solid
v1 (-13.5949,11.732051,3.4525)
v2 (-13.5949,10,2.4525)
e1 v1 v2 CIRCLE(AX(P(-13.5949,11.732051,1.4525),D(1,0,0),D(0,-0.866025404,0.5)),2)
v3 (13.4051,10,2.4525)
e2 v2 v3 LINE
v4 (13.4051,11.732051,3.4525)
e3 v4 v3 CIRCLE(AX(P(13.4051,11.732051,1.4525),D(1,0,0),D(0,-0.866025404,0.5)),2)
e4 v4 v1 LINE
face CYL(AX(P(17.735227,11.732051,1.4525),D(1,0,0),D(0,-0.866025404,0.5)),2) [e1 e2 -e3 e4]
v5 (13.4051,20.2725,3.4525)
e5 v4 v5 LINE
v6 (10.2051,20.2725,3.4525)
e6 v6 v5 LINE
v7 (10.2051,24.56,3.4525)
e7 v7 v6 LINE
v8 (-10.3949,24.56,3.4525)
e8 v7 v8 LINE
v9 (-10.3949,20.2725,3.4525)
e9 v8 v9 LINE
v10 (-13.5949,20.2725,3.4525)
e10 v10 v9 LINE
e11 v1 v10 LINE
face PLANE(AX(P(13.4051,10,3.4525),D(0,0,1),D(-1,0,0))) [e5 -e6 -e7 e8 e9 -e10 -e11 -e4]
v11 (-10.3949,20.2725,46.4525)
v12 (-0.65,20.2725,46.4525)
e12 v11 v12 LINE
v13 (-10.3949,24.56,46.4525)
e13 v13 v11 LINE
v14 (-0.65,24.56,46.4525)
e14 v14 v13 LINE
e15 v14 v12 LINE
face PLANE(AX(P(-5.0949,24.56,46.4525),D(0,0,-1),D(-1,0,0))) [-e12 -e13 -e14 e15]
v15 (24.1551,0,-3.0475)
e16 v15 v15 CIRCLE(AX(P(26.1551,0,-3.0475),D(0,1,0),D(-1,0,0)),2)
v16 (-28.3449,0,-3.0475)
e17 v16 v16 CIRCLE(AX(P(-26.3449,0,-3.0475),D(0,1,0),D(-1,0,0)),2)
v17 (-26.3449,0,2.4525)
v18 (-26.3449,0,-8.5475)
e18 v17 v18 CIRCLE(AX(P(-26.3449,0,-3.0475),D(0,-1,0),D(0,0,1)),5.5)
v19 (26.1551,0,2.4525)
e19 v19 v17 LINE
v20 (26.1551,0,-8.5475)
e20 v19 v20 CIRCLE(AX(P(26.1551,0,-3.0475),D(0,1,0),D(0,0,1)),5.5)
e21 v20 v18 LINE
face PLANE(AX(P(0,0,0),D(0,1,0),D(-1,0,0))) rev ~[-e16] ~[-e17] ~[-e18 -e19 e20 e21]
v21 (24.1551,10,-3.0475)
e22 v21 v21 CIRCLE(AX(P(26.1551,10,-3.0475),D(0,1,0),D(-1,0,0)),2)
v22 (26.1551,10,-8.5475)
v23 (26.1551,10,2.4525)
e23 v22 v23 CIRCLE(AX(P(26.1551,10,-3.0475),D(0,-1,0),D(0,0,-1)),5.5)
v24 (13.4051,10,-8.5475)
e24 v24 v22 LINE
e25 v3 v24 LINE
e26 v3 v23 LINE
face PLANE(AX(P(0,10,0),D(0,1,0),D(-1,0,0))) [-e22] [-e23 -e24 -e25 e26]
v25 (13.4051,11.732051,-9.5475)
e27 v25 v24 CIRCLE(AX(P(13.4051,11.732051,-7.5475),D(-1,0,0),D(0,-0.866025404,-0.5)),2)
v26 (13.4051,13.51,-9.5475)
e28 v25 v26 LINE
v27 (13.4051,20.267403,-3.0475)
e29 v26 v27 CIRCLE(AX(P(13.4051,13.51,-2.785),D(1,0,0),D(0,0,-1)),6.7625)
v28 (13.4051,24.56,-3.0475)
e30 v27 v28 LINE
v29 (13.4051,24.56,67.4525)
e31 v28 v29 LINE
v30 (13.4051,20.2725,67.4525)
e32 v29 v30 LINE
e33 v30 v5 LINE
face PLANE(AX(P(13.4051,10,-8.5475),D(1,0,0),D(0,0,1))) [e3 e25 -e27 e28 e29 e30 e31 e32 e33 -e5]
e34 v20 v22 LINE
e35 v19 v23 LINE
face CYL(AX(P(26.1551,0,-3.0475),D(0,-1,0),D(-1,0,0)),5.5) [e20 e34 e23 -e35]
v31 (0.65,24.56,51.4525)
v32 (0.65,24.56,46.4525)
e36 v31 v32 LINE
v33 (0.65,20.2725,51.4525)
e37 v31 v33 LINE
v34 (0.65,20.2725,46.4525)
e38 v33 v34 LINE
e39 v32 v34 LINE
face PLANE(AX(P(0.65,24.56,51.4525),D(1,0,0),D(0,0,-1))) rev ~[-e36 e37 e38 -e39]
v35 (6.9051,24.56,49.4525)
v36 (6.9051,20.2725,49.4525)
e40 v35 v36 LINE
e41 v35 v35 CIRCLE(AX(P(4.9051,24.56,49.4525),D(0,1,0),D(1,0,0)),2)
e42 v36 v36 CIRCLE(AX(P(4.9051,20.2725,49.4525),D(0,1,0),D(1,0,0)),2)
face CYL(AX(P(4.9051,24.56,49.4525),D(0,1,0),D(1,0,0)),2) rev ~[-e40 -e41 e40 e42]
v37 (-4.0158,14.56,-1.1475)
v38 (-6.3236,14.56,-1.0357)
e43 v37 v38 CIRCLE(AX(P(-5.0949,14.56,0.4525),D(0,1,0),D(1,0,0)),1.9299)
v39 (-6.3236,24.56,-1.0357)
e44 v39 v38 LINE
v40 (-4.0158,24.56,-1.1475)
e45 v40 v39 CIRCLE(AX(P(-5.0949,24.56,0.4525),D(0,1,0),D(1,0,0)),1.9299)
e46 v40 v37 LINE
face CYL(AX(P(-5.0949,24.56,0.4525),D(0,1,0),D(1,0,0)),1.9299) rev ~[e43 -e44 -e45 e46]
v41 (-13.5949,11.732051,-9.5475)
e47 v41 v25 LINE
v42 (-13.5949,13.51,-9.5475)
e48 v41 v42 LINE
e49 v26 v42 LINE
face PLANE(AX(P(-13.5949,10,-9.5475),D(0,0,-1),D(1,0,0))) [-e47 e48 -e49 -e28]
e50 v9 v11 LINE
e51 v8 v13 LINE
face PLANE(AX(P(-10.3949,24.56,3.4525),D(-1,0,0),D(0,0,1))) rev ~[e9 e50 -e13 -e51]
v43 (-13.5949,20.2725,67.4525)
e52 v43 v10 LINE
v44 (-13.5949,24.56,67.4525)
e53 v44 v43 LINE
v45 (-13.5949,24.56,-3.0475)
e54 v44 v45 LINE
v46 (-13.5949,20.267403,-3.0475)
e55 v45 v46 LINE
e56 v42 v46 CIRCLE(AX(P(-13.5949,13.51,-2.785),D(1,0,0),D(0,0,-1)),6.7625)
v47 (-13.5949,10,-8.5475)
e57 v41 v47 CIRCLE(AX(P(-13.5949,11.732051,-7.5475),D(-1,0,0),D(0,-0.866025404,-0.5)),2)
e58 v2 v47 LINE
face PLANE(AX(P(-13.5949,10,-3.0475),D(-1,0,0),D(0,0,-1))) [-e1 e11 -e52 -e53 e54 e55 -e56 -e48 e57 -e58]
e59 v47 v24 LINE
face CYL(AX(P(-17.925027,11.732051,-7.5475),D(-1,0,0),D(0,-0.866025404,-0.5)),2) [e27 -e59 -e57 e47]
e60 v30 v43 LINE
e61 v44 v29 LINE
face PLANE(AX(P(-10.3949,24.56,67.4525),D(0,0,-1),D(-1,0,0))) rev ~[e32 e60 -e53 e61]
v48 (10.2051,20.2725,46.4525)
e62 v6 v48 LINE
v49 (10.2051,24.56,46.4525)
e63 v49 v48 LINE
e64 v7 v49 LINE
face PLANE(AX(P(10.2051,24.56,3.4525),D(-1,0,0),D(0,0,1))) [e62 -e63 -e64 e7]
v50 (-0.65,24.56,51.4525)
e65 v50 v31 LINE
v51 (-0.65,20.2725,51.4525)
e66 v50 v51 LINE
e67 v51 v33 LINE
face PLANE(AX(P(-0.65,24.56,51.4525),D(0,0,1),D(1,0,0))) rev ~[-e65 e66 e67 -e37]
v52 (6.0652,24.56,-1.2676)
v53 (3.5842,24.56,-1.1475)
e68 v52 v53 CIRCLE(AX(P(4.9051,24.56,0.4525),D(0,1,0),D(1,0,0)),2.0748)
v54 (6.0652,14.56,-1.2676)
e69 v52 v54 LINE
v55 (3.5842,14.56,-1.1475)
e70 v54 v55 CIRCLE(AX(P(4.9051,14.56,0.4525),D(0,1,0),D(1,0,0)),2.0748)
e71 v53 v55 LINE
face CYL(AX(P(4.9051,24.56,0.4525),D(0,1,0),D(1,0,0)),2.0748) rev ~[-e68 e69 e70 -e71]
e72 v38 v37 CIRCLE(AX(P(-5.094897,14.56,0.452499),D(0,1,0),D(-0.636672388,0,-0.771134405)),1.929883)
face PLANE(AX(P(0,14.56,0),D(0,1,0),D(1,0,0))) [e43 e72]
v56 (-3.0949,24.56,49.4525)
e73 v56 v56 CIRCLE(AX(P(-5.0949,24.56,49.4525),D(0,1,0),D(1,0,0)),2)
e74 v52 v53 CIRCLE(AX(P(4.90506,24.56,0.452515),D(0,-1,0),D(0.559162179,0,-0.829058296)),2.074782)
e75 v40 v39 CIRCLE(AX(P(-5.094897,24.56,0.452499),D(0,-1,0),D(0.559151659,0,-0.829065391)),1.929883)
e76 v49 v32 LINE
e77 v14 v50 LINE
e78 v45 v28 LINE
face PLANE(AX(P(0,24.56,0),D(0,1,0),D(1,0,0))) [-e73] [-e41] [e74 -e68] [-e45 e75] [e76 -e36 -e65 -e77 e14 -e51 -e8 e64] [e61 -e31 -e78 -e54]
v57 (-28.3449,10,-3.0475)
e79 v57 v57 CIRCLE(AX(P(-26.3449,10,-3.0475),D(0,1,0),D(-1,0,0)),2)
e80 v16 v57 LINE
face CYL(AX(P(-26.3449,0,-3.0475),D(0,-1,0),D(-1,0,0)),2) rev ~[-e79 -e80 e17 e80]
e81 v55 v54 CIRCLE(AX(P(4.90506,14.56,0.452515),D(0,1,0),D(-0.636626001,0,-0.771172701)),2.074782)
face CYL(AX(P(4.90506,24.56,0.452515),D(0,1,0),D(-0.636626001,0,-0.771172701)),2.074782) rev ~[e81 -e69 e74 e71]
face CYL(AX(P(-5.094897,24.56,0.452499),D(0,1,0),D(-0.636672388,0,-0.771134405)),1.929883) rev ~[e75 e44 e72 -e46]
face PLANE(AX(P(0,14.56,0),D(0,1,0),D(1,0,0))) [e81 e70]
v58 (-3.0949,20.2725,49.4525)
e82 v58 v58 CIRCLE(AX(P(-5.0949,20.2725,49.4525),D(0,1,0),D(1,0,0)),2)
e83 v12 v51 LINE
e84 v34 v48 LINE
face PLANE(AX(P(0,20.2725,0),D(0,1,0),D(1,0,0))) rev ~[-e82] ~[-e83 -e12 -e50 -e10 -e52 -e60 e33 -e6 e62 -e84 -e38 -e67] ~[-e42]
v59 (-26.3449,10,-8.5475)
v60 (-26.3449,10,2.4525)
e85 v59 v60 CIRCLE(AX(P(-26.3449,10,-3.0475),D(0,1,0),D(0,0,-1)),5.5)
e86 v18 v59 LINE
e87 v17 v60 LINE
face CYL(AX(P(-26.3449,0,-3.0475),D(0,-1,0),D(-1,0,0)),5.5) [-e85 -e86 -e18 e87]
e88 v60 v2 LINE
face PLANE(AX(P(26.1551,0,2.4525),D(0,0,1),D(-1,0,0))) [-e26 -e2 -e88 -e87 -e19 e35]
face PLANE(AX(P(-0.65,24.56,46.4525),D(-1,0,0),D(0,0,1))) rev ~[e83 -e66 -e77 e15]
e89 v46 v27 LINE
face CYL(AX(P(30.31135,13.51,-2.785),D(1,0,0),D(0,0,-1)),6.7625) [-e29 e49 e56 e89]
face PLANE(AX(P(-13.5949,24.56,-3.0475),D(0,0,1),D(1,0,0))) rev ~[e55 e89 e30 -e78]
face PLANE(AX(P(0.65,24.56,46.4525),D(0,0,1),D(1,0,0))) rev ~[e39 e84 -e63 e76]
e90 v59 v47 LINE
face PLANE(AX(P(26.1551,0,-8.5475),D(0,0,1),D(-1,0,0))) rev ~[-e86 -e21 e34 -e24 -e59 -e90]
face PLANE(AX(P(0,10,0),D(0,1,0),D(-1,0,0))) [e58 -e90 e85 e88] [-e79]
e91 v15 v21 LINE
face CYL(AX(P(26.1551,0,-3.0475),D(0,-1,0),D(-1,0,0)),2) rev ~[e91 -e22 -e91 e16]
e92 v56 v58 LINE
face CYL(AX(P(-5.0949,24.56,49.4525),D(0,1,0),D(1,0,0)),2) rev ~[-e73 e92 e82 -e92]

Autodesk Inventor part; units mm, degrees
ref_plane "YZ Plane" through (0, 0, 0) normal (1, 0, 0) x (0, 1, 0)
ref_plane "XZ Plane" through (0, 0, 0) normal (0, 1, 0) x (-1, 0, 0)
ref_plane "XY Plane" through (0, 0, 0) normal (0, 0, 1) x (1, 0, 0)
sketch "Sketch1" plane through (0, 0, 0) normal (0, 1, 0) x (-1, 0, 0)
  circle A0 centre (-26.1551, -3.0475) radius 2
  arc A1 (-34.9051, -0.0475) -> (-17.4051, -0.0475) centre (-26.1551, -0.0475) ccw
  arc A2 (17.5949, -0.0475) -> (35.0949, -0.0475) centre (26.3449, -0.0475) ccw
  circle A3 centre (26.3449, -3.0475) radius 2
  circle A4 centre (-26.1551, -3.0475) radius 2
  circle A5 centre (26.3449, -3.0475) radius 2
  circle A6 centre (26.3449, -0.0475) radius 8.75
  circle A7 centre (-26.1551, -0.0475) radius 8.75
  line L0 (-34.9051, -0.0475) -> (-17.4051, -0.0475)
  line L1 (17.5949, -0.0475) -> (35.0949, -0.0475)
  circle A8 centre (-26.1551, -3.0475) radius 5.5
  circle A9 centre (26.3449, -3.0475) radius 5.5
  line L2 (-26.1551, -8.5475) -> (26.3449, -8.5475)
  line L3 (-26.1551, 2.4525) -> (26.3449, 2.4525)
  point P0 (0, 0)
  dimension "d0" = 11
  dimension "d1" = 11
extrude "Extrusion1" add sketch "Sketch1" along normal blind 10 contours L2 A8 L0 A1 | A1 A7 L3 A6 A2 L2 | A7 L0 A8 L3 | A8 L0 | L0 A8 | A2 L1 A9 L2 | L3 A9 L1 A6 | A9 L1 | A9 L1 picked at (-18.6939, -1.0014) picked at (-20.5799, 1.133) picked at (18.8536, -1.0809) picked at (20.7697, 1.133)
sketch "Sketch2" plane through (0, 10, 0) normal (0, 1, 0) x (1, 0, 0)
  line L0 (26.1551, 8.5475) -> (-26.3449, 8.5475) projected
  line L1 (-26.3449, -2.4525) -> (26.1551, -2.4525) projected
  arc A0 (-26.3449, 8.5475) -> (-26.3449, -2.4525) centre (-26.3449, 3.0475) ccw projected
  arc A1 (26.1551, -2.4525) -> (26.1551, 8.5475) centre (26.1551, 3.0475) ccw projected
  line L2 (-31.8449, 3.0475) -> (31.6551, 3.0475)
  line L3 (13.4051, -3.4525) -> (-13.5949, -3.4525)
  line L4 (-13.5949, -3.4525) -> (-13.5949, 9.5475)
  line L5 (-13.5949, 9.5475) -> (13.4051, 9.5475)
  line L6 (13.4051, 9.5475) -> (13.4051, -3.4525)
  line L7 (13.4051, -3.4525) -> (-13.5949, 9.5475) construction
  line L8 (-13.5949, -3.4525) -> (13.4051, 9.5475) construction
  point P0 (0, 0)
  point P1 (-0.0949, 3.0475)
  dimension "d4" = 27
  dimension "d5" = 13
extrude "Extrusion2" add sketch "Sketch2" along normal blind 14.56 contours L6 L2 L4 L0 | L0 L4 L5 L6 | L6 L1 L4 L2 | L6 L3 L4 L1
fillet "Fillet1" radius 2 2 edges at (-0.0949, 10, 3.4525) (-0.0949, 10, -9.5475)
sketch "Sketch3" plane through (0, 24.56, 0) normal (0, 1, 0) x (1, 0, 0)
  arc A0 (-6.3236, 1.0357) -> (-4.0158, 1.1475) centre (-5.0949, -0.4525) ccw
  arc A1 (3.5842, 1.1475) -> (6.0652, 1.2676) centre (4.9051, -0.4525) ccw
  circle A2 centre (4.9051, -0.4525) radius 2.0748
  circle A3 centre (-5.0949, -0.4525) radius 1.9299
  line L0 (-13.5949, 9.5475) -> (-13.5949, -3.4525) projected
  line L1 (13.4051, 9.5475) -> (-13.5949, 9.5475) projected
  line L2 (-13.5949, -3.4525) -> (13.4051, -3.4525) projected
  line L3 (13.4051, -3.4525) -> (13.4051, 9.5475) projected
  point P0 (0, 0)
  point P1 (6.0652, 1.2676)
  point P2 (-4.0158, 1.1475)
  dimension "d12" = 8.5
  dimension "d13" = 8.5
extrude "Extrusion3" cut sketch "Sketch3" against normal blind 10 contours A3 A0 | A2 A1
sketch "Sketch4" plane through (0, 24.56, 0) normal (0, 1, 0) x (1, 0, 0)
  line L0 (13.4051, 9.5475) -> (-13.5949, 9.5475) projected
  line L1 (-13.5949, -2.4525) -> (-13.5949, 8.5475) projected
  line L2 (13.4051, 9.5475) -> (-13.5949, 9.5475)
  line L3 (-13.5949, 9.5475) -> (-13.5949, 3.0475)
  line L4 (-13.5949, 3.0475) -> (13.4051, 3.0475)
  line L5 (13.4051, 3.0475) -> (13.4051, 9.5475)
  point P0 (0, 0)
extrude "Extrusion4" cut sketch "Sketch4" against normal blind 4.2875
fillet "Fillet2" radius 6.7625 1 edges at (-0.0949, 20.2725, -9.5475)
sketch "Sketch5" plane through (0, 24.56, 0) normal (0, 1, 0) x (1, 0, 0)
  line L0 (-13.5949, -3.4525) -> (13.4051, -3.4525) projected
  line L1 (-10.3949, -3.4525) -> (-10.3949, -67.4525)
  line L2 (10.2051, -3.4525) -> (10.2051, -67.4525)
  line L3 (-13.5949, 3.0475) -> (-13.5949, -3.4525) projected
  circle A0 centre (-5.0949, -49.4525) radius 2
  line L4 (13.4051, -3.4525) -> (13.4051, 3.0475) projected
  circle A1 centre (4.9051, -49.4525) radius 2
  circle A2 centre (4.9051, -49.4525) radius 3
  circle A3 centre (-5.0949, -49.4525) radius 3
  line L5 (-10.3949, -67.4525) -> (10.2051, -67.4525)
  line L6 (-10.3949, -67.4525) -> (-13.5949, -67.4525)
  line L7 (-13.5949, -67.4525) -> (-13.5949, -3.4525)
  line L8 (10.2051, -67.4525) -> (13.4051, -67.4525)
  line L9 (13.4051, -67.4525) -> (13.4051, -3.4525)
  line L10 (-5.0949, -46.4525) -> (4.9051, -46.4525)
  line L11 (10.2051, -46.4525) -> (-10.3949, -46.4525)
  line L12 (-0.65, -46.4525) -> (-0.65, -51.4525)
  line L13 (-0.65, -51.4525) -> (0.65, -51.4525)
  line L14 (0.65, -51.4525) -> (0.65, -46.4525)
  line L15 (0, -46.4525) -> (-0.65, -51.4525) construction
  line L16 (0, -46.4525) -> (0.65, -51.4525) construction
  point P0 (0, 0)
  point P1 (13.4051, -0.2025)
  point P2 (4.9051, -46.4525)
  dimension "d28" = 6
  dimension "d29" = 6
  dimension "d19" = 3.2
  dimension "d20" = 64
  dimension "d21" = 3.2
  dimension "d22" = 64
  dimension "d23" = 46
  dimension "d24" = 8.5
  dimension "d25" = 4
  dimension "d26" = 8.5
  dimension "d27" = 4
  dimension "d30" = 1.3
extrude "Extrusion5" add sketch "Sketch5" against normal blind 4.2875 contours L0 L1 L6 L7 | L0 L9 L8 L2 | A2 | A3 | L11 L10 L12 L13 L14 L2 L5 L1
properties part number "Servo_Holder"
